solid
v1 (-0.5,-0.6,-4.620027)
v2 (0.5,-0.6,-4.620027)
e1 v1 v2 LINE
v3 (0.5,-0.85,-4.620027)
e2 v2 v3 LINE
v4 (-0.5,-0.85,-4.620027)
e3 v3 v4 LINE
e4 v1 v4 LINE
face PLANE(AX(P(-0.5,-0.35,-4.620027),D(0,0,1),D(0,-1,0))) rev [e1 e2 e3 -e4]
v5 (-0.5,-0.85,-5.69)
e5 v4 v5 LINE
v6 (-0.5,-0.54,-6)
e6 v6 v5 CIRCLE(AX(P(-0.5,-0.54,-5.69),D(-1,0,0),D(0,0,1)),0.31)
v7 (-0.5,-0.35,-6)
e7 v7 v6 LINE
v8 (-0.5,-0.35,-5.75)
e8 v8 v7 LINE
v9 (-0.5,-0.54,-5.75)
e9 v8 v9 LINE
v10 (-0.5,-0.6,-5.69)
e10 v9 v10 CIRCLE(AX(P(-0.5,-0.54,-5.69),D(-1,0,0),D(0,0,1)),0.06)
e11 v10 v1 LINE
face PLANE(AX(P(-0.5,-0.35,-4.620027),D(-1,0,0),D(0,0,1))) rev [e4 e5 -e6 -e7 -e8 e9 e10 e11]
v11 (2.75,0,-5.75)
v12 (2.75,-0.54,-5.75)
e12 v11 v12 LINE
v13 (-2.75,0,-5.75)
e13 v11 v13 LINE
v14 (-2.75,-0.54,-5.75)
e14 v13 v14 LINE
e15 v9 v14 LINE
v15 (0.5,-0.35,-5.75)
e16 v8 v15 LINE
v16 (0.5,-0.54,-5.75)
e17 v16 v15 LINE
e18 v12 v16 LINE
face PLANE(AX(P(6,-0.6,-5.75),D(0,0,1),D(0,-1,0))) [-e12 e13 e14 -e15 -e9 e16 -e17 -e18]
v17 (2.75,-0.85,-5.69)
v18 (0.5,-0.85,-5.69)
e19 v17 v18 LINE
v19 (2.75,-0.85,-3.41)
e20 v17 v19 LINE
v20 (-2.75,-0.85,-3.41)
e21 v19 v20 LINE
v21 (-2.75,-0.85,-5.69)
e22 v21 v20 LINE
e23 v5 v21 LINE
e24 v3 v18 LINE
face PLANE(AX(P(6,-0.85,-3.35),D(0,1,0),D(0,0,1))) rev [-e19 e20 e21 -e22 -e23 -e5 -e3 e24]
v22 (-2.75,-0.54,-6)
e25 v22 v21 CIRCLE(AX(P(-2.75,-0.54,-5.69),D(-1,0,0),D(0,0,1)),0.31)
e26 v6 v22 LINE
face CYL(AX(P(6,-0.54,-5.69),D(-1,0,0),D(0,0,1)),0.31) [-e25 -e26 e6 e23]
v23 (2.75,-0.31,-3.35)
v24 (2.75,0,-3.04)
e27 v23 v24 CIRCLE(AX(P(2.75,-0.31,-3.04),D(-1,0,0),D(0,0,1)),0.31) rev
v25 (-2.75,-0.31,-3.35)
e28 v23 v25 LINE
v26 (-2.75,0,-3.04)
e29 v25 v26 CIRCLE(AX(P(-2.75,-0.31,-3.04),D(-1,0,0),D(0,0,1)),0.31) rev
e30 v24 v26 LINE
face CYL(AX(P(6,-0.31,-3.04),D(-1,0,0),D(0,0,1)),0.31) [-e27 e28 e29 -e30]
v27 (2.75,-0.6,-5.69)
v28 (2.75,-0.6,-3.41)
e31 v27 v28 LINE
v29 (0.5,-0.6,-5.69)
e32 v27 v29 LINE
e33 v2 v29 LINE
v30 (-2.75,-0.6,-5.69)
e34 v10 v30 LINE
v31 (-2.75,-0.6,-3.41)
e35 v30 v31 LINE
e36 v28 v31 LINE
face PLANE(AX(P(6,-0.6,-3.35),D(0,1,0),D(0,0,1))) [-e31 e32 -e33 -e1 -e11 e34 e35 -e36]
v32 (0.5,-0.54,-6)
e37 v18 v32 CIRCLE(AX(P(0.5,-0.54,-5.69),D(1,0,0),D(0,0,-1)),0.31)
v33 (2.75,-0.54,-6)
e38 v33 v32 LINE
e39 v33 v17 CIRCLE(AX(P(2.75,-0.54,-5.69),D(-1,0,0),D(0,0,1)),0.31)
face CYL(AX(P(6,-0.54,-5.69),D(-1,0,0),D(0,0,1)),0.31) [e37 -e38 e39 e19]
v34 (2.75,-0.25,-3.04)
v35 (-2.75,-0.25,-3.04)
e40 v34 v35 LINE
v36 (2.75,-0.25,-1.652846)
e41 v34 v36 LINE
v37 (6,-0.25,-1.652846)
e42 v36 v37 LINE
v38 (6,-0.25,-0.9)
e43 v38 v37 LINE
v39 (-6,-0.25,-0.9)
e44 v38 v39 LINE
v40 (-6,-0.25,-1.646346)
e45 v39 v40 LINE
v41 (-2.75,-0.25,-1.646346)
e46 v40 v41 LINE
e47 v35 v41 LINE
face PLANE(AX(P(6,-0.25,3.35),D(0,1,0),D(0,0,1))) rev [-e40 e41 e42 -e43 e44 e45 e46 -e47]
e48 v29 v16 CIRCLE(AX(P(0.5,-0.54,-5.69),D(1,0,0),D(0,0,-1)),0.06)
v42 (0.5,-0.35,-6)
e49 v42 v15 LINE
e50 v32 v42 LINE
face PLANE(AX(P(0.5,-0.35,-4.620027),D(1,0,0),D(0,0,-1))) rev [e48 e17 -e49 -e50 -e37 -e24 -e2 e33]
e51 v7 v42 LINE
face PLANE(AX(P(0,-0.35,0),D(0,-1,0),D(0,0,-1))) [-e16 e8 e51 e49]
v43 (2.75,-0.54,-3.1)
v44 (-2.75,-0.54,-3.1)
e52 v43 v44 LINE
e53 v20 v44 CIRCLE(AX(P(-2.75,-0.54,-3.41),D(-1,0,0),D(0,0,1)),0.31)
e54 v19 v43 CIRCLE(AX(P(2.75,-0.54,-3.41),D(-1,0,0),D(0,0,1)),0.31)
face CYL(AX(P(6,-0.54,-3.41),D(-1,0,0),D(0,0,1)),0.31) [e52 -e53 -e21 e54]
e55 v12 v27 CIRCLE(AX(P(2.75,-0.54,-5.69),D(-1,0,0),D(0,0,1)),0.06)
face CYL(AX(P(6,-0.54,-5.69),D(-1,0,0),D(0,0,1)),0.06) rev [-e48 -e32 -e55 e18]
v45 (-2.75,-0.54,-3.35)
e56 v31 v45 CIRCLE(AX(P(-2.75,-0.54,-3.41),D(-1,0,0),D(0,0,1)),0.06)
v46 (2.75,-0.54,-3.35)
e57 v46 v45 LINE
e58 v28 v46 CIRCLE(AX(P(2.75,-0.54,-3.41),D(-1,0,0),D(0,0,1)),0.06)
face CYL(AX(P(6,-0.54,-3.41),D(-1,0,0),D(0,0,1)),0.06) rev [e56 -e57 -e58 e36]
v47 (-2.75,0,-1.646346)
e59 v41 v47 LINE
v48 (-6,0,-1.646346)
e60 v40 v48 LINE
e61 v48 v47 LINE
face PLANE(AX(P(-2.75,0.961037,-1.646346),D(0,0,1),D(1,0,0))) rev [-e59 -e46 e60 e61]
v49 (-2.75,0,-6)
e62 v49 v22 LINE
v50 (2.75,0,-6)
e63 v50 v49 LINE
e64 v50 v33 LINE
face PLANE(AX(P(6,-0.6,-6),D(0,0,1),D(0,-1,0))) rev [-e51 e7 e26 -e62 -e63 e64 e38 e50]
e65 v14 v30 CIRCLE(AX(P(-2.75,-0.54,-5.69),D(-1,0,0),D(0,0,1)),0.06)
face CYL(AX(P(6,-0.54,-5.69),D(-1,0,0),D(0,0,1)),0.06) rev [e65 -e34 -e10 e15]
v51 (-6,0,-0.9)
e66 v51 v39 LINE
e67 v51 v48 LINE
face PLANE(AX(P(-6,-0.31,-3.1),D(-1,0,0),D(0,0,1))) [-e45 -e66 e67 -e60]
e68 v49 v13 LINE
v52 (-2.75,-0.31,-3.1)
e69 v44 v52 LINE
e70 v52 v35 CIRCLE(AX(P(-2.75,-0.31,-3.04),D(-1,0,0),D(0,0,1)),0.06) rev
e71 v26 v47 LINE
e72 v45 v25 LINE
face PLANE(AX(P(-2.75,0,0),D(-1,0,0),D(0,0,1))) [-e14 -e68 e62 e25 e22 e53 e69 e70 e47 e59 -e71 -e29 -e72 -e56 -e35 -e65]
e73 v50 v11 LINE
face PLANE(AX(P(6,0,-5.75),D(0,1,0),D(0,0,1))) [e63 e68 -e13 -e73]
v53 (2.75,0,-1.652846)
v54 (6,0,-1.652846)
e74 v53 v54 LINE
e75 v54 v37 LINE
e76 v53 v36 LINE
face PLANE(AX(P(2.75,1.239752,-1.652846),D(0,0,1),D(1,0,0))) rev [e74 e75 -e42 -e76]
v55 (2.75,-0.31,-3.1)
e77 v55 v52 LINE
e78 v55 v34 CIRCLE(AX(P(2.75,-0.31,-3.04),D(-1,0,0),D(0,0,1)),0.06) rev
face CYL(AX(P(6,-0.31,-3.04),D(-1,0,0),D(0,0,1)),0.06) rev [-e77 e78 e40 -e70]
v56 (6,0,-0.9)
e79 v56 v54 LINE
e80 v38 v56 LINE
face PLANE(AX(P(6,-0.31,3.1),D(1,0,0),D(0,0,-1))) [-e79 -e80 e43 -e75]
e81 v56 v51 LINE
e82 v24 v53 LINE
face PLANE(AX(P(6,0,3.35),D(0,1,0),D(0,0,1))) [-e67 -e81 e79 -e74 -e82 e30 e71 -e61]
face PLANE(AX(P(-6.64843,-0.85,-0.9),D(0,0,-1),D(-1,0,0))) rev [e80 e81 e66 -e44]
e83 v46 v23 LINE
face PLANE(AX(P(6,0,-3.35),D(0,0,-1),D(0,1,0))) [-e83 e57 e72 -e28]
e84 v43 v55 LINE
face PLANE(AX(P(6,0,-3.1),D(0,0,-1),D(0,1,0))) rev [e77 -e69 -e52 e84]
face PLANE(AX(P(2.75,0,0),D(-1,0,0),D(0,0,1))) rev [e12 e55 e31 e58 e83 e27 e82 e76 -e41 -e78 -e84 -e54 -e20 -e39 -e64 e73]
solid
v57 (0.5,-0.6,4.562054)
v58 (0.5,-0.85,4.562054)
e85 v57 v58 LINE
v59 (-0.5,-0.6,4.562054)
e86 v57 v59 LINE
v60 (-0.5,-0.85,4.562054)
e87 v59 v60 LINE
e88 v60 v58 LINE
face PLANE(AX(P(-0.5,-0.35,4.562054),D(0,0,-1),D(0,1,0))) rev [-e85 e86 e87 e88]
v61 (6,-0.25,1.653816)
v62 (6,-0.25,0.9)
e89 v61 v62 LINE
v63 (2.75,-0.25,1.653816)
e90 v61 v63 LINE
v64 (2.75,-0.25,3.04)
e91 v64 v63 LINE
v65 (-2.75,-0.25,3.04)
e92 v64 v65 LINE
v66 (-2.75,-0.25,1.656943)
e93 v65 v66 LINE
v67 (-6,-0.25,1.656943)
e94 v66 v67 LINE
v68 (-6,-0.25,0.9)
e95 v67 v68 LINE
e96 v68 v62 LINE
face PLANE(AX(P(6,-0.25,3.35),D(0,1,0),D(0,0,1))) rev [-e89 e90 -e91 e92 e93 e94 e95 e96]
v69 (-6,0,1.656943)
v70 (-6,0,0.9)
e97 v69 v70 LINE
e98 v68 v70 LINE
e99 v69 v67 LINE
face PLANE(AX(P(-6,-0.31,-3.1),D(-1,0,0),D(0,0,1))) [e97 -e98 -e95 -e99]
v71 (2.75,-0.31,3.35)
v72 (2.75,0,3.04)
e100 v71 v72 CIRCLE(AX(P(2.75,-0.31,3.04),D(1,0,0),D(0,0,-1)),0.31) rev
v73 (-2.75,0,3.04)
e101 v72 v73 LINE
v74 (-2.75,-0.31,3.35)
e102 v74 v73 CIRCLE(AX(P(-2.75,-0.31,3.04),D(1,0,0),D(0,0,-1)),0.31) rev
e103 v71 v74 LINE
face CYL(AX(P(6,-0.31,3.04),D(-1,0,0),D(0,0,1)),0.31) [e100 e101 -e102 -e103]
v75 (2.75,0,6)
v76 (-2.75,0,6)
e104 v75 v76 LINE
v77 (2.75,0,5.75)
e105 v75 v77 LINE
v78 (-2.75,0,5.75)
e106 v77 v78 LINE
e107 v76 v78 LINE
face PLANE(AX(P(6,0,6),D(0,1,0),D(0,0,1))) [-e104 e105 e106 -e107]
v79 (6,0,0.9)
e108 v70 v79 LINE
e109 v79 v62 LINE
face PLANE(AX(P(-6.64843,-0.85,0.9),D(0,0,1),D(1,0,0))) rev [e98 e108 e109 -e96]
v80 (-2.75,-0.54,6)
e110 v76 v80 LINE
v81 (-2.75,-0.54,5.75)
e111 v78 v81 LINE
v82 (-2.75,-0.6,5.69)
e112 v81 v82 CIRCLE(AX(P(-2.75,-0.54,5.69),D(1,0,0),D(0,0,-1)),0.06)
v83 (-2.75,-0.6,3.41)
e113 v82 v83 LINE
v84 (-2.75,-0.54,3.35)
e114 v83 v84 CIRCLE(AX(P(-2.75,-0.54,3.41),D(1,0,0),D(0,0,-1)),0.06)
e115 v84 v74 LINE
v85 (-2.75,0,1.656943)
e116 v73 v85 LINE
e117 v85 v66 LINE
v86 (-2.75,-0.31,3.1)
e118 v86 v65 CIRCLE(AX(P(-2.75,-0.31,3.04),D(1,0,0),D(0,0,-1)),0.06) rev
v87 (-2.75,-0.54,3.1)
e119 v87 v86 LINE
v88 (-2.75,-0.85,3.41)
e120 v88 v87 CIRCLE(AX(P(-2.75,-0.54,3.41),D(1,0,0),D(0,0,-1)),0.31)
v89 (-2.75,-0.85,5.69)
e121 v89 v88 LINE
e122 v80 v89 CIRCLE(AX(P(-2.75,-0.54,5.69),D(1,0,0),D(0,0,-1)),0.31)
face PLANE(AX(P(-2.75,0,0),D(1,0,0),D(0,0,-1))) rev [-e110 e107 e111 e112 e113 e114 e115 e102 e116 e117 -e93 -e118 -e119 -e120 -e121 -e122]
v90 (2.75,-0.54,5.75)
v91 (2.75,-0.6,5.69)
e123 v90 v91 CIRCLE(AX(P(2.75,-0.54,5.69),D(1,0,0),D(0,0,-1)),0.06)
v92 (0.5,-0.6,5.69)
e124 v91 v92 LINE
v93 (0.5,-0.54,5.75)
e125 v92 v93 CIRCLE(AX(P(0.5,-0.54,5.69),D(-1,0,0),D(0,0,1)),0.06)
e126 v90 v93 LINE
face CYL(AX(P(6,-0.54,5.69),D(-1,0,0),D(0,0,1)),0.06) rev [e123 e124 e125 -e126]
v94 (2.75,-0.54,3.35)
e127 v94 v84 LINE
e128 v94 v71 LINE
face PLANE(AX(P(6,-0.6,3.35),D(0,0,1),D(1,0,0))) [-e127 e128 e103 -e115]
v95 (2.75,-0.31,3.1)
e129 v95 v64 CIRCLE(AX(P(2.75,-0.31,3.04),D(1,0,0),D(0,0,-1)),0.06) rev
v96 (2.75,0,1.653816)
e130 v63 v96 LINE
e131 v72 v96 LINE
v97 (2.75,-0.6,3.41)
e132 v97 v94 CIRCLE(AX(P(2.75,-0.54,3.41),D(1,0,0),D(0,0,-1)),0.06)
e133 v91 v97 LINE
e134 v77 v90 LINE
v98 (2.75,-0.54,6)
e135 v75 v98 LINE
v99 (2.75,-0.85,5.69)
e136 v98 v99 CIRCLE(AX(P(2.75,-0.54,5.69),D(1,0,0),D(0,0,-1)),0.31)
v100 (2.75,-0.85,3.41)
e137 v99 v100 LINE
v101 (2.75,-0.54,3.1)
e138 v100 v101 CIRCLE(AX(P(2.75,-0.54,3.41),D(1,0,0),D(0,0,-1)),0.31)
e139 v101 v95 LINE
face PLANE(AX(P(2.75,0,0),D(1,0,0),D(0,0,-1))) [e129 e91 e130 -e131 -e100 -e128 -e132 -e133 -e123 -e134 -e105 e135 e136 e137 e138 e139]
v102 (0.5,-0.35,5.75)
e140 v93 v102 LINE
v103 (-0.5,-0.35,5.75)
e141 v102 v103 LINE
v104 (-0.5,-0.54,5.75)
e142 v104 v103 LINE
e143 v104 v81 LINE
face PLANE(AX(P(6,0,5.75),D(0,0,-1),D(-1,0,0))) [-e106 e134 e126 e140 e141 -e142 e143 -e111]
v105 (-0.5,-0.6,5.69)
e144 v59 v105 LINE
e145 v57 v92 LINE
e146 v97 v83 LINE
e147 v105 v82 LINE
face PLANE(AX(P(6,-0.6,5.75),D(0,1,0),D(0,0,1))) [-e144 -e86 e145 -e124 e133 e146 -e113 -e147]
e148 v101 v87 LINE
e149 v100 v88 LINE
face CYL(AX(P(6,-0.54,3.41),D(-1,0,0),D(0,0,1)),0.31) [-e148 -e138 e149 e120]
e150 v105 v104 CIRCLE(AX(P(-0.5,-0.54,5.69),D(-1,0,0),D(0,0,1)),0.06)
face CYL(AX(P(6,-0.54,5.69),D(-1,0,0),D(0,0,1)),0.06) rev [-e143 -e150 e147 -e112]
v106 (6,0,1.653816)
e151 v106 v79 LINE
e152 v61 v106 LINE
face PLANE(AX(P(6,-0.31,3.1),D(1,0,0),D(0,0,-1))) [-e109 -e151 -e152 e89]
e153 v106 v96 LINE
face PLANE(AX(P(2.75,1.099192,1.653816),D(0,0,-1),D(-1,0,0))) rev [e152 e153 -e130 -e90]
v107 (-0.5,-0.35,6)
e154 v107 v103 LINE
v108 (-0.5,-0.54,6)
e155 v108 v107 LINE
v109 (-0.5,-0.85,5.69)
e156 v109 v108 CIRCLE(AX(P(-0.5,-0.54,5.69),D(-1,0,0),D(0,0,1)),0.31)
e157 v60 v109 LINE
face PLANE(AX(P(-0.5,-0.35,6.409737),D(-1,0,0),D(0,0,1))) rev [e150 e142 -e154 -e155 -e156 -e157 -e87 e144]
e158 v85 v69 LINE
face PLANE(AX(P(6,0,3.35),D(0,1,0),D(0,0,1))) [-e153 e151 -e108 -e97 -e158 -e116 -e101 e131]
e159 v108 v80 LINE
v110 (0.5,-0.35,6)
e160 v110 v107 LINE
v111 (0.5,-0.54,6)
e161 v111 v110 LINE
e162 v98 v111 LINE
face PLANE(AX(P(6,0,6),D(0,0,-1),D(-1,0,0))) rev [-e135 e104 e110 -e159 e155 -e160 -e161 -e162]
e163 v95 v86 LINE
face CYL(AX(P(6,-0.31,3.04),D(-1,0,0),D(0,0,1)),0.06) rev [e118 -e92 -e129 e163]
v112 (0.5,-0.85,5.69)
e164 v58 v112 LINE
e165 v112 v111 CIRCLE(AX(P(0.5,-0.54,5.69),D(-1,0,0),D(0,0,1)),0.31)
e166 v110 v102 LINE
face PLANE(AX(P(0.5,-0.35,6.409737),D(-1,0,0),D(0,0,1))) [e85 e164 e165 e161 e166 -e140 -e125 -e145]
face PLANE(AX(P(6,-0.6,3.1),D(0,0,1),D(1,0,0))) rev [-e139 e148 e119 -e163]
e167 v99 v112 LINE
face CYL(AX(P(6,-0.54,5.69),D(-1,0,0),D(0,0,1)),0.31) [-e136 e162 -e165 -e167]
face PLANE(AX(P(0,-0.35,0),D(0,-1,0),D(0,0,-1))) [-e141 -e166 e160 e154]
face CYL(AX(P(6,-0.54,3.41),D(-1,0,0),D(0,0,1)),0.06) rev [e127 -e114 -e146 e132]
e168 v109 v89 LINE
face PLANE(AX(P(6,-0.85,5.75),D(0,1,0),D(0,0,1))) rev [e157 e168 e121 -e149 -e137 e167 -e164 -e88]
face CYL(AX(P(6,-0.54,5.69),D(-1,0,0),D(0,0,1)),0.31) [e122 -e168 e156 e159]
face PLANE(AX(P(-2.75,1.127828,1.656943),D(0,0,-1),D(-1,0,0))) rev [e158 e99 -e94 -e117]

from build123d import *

# Parameters (mm, degrees)
BASE_FLANGE1_DEPTH      = 6
BASE_FLANGE1_DEPTH_BACK = 6
SKETCH6_W               = 13.296859842
SKETCH6_H               = 1.8
CUT_EXTRUDE1_DEPTH      = 9.527748824
SKETCH13_W              = 4.845267679
SKETCH13_H              = 2.171613948
CUT_EXTRUDE2_DEPTH      = 3.25
SKETCH14_W              = 4.988611219
SKETCH14_H              = 2.401394512
CUT_EXTRUDE3_DEPTH      = 3.25
SKETCH15_W              = 4.899845387
SKETCH15_H              = 2.254166158
CUT_EXTRUDE4_DEPTH      = 3.25
SKETCH16_W              = 4.867112092
SKETCH16_H              = 2.480011595
CUT_EXTRUDE5_DEPTH      = 3.25
SKETCH20_W              = 1
SKETCH20_H              = 1.552815678
CUT_EXTRUDE8_DEPTH      = 0.5
SKETCH21_W              = 1
SKETCH21_H              = 1.847683093
CUT_EXTRUDE9_DEPTH      = 0.5


# Sheet-metal steps are written as plain solids
with BuildPart() as part:
    # Sketch1 → Base-Flange1 (new, two sides: drawn at the far end of the back side and taken through both)
    with BuildSketch(Plane(origin=(0, 0, 0), x_dir=(0, 0, -1), z_dir=(1, 0, 0)).offset(-BASE_FLANGE1_DEPTH_BACK)):
        with BuildLine():
            Line((-5.75, 0), (-5.75, -0.54))
            ThreePointArc((-5.75, -0.54), (-5.732426407, -0.582426407), (-5.69, -0.6))
            Line((-5.69, -0.6), (-3.41, -0.6))
            ThreePointArc((-3.41, -0.6), (-3.367573593, -0.582426407), (-3.35, -0.54))
            Line((-3.35, -0.54), (-3.35, -0.31))
            ThreePointArc((-3.35, -0.31), (-3.259203102, -0.090796898), (-3.04, 0))
            Line((-3.04, 0), (3.04, 0))
            ThreePointArc((3.04, 0), (3.259203102, -0.090796898), (3.35, -0.31))
            Line((3.35, -0.31), (3.35, -0.54))
            ThreePointArc((3.35, -0.54), (3.367573593, -0.582426407), (3.41, -0.6))
            Line((3.41, -0.6), (5.69, -0.6))
            ThreePointArc((5.69, -0.6), (5.732426407, -0.582426407), (5.75, -0.54))
            Line((5.75, -0.54), (5.75, 0))
            Line((5.75, 0), (6, 0))
            Line((6, 0), (6, -0.54))
            ThreePointArc((6, -0.54), (5.909203102, -0.759203102), (5.69, -0.85))
            Line((5.69, -0.85), (3.41, -0.85))
            ThreePointArc((3.41, -0.85), (3.190796898, -0.759203102), (3.1, -0.54))
            Line((3.1, -0.54), (3.1, -0.31))
            ThreePointArc((3.1, -0.31), (3.082426407, -0.267573593), (3.04, -0.25))
            Line((3.04, -0.25), (-3.04, -0.25))
            ThreePointArc((-3.04, -0.25), (-3.082426407, -0.267573593), (-3.1, -0.31))
            Line((-3.1, -0.31), (-3.1, -0.54))
            ThreePointArc((-3.1, -0.54), (-3.190796898, -0.759203102), (-3.41, -0.85))
            Line((-3.41, -0.85), (-5.69, -0.85))
            ThreePointArc((-5.69, -0.85), (-5.909203102, -0.759203102), (-6, -0.54))
            Line((-6, -0.54), (-6, 0))
            Line((-6, 0), (-5.75, 0))
        make_face()
    extrude(amount=BASE_FLANGE1_DEPTH + BASE_FLANGE1_DEPTH_BACK)

    # Sketch6 → Cut-Extrude1 (cut, through all)
    with BuildSketch(Plane(origin=(0, 0, 0), x_dir=(1, 0, 0), z_dir=(0, 1, 0))):
        Rectangle(SKETCH6_W, SKETCH6_H)
    extrude(amount=-CUT_EXTRUDE1_DEPTH, mode=Mode.SUBTRACT)


with BuildPart() as cut_extrude1_piece_1:
    # of the separate pieces the step leaves, piece 1, a body of its own (cut_extrude1_pieces)
    add(part.part.solids().sort_by_distance((6, -0.85, 5.69))[0])

    # Sketch14 → Cut-Extrude3 (cut)
    with BuildSketch(Plane.ZY.offset(6)):
        with Locations((4.151248365, -0.072869224)):
            Rectangle(SKETCH14_W, SKETCH14_H)
    extrude(amount=-CUT_EXTRUDE3_DEPTH, mode=Mode.SUBTRACT)

    # Sketch15 → Cut-Extrude4 (cut)
    with BuildSketch(Plane(origin=(6, 0, 0), x_dir=(0, 0, -1), z_dir=(1, 0, 0))):
        with Locations((-4.103738605, -0.027890916)):
            Rectangle(SKETCH15_W, SKETCH15_H)
    extrude(amount=-CUT_EXTRUDE4_DEPTH, mode=Mode.SUBTRACT)

    # Sketch21 → Cut-Extrude9 (cut)
    with BuildSketch(Plane.XZ.offset(0.85)):
        with Locations((0, 5.485895168)):
            Rectangle(SKETCH21_W, SKETCH21_H)
    extrude(amount=-CUT_EXTRUDE9_DEPTH, mode=Mode.SUBTRACT)


with BuildPart() as cut_extrude1_piece_2:
    # of the separate pieces the step leaves, piece 2, a body of its own (cut_extrude1_pieces)
    add(part.part.solids().sort_by_distance((6, -0.25, -3.04))[0])

    # Sketch13 → Cut-Extrude2 (cut)
    with BuildSketch(Plane.ZY.offset(6)):
        with Locations((-4.068980064, -0.124769523)):
            Rectangle(SKETCH13_W, SKETCH13_H)
    extrude(amount=-CUT_EXTRUDE2_DEPTH, mode=Mode.SUBTRACT)

    # Sketch16 → Cut-Extrude5 (cut)
    with BuildSketch(Plane(origin=(6, 0, 0), x_dir=(0, 0, -1), z_dir=(1, 0, 0))):
        with Locations((4.086402332, -0.000253921)):
            Rectangle(SKETCH16_W, SKETCH16_H)
    extrude(amount=-CUT_EXTRUDE5_DEPTH, mode=Mode.SUBTRACT)

    # Sketch20 → Cut-Extrude8 (cut)
    with BuildSketch(Plane.XZ.offset(0.85)):
        with Locations((0, -5.396434848)):
            Rectangle(SKETCH20_W, SKETCH20_H)
    extrude(amount=-CUT_EXTRUDE8_DEPTH, mode=Mode.SUBTRACT)


solid = Compound([cut_extrude1_piece_1.part, cut_extrude1_piece_2.part])
